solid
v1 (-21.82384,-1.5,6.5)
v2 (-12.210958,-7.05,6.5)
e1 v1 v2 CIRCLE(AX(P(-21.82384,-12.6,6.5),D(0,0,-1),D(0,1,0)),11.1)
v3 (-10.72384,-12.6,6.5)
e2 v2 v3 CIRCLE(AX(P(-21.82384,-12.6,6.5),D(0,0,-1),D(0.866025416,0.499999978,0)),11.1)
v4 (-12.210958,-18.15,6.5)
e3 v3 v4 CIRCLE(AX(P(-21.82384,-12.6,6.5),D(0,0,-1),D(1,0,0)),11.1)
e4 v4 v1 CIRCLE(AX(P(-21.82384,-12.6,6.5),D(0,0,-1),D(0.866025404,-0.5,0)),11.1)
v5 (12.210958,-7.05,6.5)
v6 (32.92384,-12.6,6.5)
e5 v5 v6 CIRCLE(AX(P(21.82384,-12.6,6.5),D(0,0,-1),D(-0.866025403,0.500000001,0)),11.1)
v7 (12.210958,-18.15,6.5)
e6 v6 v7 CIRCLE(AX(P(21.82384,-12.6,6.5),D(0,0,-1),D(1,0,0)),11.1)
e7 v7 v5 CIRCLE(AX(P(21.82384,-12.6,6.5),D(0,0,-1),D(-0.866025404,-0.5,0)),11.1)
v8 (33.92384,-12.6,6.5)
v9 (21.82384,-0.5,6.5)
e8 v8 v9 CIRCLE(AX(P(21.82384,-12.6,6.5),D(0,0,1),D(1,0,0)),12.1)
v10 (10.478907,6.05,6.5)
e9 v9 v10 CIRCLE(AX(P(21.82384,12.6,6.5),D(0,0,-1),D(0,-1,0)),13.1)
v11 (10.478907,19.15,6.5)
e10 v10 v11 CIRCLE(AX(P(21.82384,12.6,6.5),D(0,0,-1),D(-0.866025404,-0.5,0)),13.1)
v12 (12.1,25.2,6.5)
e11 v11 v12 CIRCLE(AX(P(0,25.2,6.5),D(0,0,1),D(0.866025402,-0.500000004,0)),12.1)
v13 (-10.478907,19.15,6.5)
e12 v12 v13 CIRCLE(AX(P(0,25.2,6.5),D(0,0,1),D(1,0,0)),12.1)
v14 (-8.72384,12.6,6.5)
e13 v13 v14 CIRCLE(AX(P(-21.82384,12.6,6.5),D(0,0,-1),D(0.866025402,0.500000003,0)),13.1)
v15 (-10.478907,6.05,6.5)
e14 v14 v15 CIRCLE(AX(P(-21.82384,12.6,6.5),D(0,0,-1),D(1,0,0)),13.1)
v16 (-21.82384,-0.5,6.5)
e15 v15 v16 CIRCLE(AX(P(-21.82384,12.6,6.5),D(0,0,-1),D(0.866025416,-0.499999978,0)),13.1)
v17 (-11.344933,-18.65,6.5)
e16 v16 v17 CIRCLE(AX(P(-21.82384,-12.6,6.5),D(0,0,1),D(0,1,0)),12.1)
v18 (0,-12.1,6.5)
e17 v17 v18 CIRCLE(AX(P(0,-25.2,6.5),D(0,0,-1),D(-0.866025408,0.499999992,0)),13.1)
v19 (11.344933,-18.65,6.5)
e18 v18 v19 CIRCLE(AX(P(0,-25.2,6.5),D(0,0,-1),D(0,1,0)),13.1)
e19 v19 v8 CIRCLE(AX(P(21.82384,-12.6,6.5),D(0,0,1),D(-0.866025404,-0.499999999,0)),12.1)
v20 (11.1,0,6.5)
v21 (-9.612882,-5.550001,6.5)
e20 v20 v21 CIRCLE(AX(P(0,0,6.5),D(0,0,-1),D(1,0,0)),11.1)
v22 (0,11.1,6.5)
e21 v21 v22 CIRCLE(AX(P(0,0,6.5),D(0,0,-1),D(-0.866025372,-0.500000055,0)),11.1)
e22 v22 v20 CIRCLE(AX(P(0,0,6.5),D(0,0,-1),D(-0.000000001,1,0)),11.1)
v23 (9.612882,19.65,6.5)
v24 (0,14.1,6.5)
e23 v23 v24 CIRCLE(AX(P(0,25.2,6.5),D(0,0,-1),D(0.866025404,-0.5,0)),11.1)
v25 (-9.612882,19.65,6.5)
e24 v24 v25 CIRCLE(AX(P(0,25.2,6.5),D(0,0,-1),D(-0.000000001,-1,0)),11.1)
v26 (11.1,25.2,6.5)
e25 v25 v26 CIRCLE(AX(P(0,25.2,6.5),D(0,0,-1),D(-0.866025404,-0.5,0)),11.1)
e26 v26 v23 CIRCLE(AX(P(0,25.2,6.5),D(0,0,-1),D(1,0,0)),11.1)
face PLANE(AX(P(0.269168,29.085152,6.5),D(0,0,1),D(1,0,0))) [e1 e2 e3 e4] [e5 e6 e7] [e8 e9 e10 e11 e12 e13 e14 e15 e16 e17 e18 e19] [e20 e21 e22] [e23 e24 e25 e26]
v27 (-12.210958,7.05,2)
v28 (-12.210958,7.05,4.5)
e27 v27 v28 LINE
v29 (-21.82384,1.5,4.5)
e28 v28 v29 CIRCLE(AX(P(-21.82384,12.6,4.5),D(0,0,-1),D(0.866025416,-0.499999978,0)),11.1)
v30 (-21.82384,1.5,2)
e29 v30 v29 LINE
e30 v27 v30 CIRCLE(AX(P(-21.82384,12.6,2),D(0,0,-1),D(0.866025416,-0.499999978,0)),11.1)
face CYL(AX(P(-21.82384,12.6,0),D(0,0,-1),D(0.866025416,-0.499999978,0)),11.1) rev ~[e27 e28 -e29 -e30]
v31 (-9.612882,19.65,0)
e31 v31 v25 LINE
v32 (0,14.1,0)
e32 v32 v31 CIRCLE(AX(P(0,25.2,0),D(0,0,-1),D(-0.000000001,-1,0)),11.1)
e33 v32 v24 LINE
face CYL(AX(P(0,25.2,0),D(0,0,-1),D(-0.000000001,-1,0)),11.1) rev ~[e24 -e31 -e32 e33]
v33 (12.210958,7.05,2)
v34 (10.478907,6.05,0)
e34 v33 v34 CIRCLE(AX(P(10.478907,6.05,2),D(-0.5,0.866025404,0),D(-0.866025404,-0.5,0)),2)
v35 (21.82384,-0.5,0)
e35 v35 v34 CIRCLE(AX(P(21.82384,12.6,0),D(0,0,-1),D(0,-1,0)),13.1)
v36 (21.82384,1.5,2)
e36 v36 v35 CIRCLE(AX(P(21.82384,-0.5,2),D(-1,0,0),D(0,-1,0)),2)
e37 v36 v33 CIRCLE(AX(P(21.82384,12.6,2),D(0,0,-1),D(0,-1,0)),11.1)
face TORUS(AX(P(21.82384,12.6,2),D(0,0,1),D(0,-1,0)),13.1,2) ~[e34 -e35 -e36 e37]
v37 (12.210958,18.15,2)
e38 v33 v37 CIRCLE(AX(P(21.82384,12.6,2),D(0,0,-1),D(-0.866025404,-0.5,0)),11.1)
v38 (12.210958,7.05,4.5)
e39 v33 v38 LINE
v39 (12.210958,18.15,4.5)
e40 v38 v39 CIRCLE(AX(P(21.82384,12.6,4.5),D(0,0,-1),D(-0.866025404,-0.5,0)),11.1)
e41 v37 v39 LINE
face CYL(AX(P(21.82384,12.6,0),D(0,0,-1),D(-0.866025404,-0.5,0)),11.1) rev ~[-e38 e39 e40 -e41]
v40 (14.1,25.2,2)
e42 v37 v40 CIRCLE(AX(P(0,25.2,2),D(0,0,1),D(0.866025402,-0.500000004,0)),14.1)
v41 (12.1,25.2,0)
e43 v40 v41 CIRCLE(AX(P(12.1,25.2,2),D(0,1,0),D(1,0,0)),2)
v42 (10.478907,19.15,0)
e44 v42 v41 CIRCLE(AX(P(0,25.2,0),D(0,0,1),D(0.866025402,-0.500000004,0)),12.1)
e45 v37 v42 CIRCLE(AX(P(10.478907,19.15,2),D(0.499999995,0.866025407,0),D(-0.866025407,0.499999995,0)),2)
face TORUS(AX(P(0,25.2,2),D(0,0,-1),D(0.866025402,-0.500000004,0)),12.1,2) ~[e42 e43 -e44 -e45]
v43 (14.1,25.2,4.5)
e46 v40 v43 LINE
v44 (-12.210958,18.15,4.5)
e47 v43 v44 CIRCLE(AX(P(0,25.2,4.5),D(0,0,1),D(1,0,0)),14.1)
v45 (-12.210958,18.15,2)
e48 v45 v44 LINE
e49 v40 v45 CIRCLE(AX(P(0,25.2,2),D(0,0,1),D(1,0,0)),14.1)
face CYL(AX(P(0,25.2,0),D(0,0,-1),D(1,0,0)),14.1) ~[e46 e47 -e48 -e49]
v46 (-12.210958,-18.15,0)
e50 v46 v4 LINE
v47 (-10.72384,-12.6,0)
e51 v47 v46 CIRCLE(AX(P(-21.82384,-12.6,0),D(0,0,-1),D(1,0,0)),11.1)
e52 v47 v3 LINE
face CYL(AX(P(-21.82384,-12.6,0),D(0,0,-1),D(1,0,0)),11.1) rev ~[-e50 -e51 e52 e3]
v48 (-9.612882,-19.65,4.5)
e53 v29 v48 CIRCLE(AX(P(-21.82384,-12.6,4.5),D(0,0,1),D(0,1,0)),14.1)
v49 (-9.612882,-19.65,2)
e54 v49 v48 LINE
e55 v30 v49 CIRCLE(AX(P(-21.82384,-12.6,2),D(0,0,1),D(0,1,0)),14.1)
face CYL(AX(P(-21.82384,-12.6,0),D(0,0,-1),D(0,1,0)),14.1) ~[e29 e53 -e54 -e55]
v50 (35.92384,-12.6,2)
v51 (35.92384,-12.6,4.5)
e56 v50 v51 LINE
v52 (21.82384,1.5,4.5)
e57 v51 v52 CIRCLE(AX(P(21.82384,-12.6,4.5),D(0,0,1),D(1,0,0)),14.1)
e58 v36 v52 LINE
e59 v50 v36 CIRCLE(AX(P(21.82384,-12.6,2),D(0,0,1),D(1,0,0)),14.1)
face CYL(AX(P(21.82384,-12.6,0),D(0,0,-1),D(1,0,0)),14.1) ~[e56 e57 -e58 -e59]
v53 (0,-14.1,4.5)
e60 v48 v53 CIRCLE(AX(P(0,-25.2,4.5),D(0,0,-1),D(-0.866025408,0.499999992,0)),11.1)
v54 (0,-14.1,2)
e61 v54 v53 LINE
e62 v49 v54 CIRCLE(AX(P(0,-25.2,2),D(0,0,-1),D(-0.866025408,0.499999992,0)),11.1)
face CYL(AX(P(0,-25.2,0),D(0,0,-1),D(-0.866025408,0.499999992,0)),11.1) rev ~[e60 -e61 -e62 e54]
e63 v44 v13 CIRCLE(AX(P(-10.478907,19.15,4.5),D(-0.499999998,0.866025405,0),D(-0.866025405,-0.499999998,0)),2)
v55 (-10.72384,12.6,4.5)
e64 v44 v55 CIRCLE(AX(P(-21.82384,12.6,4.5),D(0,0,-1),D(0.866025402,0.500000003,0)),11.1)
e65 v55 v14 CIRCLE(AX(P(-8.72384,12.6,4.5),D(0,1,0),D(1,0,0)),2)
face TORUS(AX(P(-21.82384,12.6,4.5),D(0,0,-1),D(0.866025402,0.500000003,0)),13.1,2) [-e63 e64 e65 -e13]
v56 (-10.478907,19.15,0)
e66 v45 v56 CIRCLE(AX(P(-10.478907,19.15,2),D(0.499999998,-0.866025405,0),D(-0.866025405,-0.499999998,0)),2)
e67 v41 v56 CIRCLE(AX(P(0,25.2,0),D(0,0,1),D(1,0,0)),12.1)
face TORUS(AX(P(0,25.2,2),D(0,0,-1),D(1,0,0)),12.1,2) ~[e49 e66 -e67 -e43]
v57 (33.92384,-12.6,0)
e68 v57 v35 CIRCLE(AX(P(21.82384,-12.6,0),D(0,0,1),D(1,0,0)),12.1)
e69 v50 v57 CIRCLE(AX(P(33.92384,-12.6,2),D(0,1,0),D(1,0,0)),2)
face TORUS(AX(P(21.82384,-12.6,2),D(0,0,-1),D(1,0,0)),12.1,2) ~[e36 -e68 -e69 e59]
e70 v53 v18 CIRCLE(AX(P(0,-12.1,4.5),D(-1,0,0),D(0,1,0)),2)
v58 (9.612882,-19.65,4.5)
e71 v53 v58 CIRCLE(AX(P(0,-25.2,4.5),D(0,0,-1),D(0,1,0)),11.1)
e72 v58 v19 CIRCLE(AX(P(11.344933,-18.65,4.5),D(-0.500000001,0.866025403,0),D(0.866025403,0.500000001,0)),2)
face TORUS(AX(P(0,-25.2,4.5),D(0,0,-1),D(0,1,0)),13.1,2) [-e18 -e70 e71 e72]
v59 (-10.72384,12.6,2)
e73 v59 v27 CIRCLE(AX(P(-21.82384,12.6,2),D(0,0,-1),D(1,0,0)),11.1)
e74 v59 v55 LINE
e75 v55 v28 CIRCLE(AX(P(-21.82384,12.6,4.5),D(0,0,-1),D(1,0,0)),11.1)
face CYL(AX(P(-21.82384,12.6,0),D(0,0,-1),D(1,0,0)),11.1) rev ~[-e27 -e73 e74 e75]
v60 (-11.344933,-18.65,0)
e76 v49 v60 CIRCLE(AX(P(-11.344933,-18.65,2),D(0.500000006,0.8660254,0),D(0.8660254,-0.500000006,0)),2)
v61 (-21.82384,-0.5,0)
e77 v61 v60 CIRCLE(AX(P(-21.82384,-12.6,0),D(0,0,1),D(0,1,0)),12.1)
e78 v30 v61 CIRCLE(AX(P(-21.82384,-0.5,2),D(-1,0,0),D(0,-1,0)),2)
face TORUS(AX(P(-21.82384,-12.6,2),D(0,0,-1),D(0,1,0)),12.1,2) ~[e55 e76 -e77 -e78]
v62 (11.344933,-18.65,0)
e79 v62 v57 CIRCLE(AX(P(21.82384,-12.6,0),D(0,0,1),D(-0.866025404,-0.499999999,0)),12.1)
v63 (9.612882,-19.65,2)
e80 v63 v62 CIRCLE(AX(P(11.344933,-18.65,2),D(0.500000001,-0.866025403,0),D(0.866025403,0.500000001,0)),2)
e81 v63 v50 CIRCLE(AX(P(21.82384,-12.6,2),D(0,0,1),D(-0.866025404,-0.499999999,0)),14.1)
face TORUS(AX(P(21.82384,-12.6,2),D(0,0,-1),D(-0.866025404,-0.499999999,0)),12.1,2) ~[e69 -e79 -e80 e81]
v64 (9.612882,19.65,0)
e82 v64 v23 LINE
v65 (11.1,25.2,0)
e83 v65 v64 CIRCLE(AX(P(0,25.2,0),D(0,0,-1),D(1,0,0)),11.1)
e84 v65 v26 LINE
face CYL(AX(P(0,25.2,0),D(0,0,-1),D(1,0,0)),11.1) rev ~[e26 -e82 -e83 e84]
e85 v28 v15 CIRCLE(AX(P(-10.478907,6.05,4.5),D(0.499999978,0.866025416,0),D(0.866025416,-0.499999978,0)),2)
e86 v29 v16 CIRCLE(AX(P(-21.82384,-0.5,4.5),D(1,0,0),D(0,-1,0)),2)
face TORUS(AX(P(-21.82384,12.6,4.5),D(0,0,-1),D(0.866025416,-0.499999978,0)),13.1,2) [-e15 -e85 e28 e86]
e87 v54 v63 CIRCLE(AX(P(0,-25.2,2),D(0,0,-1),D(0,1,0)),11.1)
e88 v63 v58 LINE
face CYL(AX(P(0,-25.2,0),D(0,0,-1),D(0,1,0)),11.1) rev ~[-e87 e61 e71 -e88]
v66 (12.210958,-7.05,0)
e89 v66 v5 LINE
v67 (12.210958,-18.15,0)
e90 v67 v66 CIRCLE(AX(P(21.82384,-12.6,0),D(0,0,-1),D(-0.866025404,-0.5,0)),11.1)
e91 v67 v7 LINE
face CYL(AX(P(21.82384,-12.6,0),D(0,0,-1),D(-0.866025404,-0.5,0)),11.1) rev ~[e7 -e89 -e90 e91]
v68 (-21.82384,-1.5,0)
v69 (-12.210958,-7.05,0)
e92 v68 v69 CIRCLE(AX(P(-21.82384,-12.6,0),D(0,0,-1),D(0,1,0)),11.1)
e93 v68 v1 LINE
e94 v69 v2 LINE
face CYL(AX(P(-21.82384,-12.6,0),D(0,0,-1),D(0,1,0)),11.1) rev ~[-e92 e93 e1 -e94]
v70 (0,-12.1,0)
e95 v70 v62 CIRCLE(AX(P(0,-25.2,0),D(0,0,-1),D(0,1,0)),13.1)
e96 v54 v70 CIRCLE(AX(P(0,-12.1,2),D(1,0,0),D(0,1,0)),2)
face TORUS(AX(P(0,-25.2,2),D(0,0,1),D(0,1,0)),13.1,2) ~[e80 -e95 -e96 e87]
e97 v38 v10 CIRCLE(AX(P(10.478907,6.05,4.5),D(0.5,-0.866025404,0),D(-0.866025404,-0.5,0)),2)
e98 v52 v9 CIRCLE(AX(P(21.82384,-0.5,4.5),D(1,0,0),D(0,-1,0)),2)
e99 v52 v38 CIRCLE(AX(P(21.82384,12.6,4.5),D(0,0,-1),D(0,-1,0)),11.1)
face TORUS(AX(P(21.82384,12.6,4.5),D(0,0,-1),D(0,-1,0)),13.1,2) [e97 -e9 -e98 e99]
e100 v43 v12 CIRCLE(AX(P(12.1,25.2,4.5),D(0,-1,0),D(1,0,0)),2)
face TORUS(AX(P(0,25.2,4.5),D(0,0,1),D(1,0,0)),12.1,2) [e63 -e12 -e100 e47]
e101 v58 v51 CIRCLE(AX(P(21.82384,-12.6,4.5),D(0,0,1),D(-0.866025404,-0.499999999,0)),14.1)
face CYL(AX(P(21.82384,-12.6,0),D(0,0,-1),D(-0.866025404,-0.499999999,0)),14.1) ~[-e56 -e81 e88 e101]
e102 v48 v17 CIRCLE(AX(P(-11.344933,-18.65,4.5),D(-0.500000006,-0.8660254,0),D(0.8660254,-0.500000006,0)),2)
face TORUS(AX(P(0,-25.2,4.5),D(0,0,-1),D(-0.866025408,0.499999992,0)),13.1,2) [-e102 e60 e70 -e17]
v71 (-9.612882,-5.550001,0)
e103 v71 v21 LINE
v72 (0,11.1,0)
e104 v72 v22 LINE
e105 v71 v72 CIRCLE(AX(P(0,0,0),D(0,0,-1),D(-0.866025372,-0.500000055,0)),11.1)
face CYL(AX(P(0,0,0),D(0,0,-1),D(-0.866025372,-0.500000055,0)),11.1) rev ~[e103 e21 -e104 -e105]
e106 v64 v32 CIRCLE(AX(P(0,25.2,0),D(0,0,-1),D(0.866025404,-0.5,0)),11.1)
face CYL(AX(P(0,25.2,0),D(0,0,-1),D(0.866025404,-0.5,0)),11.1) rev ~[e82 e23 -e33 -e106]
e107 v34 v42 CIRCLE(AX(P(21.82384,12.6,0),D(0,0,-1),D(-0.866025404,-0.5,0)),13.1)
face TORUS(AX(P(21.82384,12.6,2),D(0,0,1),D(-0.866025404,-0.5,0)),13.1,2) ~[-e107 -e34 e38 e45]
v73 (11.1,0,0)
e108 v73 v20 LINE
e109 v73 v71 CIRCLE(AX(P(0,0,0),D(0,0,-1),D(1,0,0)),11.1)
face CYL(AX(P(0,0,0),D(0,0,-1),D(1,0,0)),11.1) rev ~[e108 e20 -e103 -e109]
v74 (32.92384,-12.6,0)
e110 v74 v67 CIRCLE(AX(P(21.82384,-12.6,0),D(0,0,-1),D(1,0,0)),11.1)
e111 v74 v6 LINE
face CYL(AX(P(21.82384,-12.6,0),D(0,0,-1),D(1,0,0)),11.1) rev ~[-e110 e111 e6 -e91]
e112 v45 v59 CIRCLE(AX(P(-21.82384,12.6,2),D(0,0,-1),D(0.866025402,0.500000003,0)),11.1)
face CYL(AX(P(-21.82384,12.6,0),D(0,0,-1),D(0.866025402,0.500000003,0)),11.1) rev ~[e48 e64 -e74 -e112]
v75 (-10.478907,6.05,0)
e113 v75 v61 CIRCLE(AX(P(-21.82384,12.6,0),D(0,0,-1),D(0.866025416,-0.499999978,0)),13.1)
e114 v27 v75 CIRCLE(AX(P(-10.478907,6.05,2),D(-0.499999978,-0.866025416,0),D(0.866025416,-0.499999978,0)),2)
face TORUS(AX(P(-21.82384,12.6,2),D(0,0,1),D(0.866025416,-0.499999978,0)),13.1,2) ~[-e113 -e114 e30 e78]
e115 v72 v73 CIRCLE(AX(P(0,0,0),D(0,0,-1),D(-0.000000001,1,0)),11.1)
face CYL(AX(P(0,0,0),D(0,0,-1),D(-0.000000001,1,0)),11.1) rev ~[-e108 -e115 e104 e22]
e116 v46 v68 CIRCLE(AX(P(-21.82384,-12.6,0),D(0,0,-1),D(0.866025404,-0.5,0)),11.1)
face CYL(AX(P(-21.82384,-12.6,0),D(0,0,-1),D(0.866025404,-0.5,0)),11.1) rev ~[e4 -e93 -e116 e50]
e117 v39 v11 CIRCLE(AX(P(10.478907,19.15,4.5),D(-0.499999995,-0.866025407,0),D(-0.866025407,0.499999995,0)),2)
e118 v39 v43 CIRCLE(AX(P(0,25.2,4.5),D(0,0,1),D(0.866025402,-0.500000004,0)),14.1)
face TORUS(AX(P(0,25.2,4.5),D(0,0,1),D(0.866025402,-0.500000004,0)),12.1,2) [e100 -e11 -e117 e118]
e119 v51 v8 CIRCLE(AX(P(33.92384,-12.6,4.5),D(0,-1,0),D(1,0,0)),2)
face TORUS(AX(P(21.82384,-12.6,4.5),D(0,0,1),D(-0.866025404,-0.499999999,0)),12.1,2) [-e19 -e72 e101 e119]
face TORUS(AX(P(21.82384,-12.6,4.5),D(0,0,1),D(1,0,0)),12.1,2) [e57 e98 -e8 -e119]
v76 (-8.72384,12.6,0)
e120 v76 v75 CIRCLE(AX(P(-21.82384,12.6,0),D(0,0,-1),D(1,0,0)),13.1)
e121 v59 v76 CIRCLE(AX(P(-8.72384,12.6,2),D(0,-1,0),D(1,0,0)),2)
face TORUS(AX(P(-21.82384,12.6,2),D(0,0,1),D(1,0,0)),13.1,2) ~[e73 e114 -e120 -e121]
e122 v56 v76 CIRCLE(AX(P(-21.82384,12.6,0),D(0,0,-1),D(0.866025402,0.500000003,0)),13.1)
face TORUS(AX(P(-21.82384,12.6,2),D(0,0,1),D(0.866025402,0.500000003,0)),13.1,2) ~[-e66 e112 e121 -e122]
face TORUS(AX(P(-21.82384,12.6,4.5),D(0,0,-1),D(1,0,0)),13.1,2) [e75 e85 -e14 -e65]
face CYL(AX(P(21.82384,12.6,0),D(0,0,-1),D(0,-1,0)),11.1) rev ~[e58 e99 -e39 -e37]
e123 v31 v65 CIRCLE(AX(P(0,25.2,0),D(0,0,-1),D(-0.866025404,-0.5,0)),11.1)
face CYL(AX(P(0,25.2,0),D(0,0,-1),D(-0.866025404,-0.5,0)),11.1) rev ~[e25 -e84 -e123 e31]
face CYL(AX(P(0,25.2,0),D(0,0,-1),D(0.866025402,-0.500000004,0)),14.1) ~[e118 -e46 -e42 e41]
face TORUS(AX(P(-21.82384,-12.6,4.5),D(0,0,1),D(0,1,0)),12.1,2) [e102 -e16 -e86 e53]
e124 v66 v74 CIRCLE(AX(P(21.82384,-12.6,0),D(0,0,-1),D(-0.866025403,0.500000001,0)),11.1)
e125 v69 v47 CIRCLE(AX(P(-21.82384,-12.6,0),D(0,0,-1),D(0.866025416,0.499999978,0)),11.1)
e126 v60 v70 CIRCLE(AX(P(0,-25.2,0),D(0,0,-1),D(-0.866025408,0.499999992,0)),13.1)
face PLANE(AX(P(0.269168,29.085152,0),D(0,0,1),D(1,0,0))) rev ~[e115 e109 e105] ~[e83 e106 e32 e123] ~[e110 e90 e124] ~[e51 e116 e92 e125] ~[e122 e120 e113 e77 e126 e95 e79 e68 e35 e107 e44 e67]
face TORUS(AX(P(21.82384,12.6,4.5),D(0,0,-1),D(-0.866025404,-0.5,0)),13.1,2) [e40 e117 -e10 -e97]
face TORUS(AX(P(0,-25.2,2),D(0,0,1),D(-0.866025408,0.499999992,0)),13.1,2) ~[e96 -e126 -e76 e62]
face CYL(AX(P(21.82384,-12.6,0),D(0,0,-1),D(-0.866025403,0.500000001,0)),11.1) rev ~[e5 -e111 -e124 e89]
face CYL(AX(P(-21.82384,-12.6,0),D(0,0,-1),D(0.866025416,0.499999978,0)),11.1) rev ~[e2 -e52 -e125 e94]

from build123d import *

# Parameters (mm, degrees)
F1_DEPTH = 6.5
F2_R     = 2


# Not quite as in the source:
# - ends of sketch curves that miss each other by under 0.0002 mm in the source are joined


with BuildPart() as f1:
    # F0 (on Top) → F1 (new body)
    with BuildSketch(Plane.XY):
        with BuildLine():
            Line((-12.2109581934, 18.15), (-9.612881982, 19.65))
            ThreePointArc((-9.612881982, 19.65), (-2.8728914006, 35.9217766718), (11.1, 25.2))
            ThreePointArc((11.1, 25.2), (10.7217766718, 22.3271085994), (9.612881982, 19.65))
            Line((9.612881982, 19.65), (12.2109581934, 18.15))
            ThreePointArc((12.2109581619, 18.1499999455), (13.6195541425, 21.5506514337), (14.1, 25.2))
            ThreePointArc((14.1, 25.2), (-3.649348519, 38.8195541552), (-12.2109582109, 18.1500000304))
        make_face()
        with BuildLine():
            ThreePointArc((-6.3285069329, 12.6), (-3.2519225117, 13.7198760919), (-7e-09, 14.1))
            ThreePointArc((-7e-09, 14.1), (-5.550000003, 15.5871180197), (-9.612881982, 19.65))
            Line((-9.612881982, 19.65), (-12.2109581934, 18.15))
            ThreePointArc((-12.2109582109, 18.1500000304), (-9.6761855625, 14.9442000331), (-6.3285069329, 12.6))
        make_face()
        with BuildLine():
            ThreePointArc((-12.2109580547, 7.0500002402), (-9.6761854488, 10.2558000741), (-6.3285069329, 12.6))
            ThreePointArc((-6.3285069329, 12.6), (-9.6761855625, 14.9442000331), (-12.2109582109, 18.1500000304))
            ThreePointArc((-12.2109582109, 18.1500000304), (-11.1020635081, 15.4728914176), (-10.7238401754, 12.6))
            ThreePointArc((-10.7238401754, 12.6), (-11.1020634677, 9.7271087333), (-12.2109580547, 7.0500002402))
        make_face()
        with BuildLine():
            ThreePointArc((-9.6128816287, -5.5500006119), (-9.6128821611, 5.5499996898), (-9.7e-09, 11.1))
            ThreePointArc((-9.7e-09, 11.1), (-3.251922513, 11.4801239084), (-6.3285069329, 12.6))
            ThreePointArc((-6.3285069329, 12.6), (-9.6761854488, 10.2558000741), (-12.2109580547, 7.0500002402))
            ThreePointArc((-12.2109580547, 7.0500002402), (-13.7198760608, 3.2519226432), (-14.0761735541, -0.8193522281))
            ThreePointArc((-14.0761735541, -0.8193522281), (-11.568039954, -2.9238147073), (-9.6128816287, -5.5500006119))
        make_face()
        with BuildLine():
            ThreePointArc((-21.8238401754, 1.5), (-17.7801496323, 0.9077224872), (-14.0761735541, -0.8193522281))
            ThreePointArc((-14.0761735541, -0.8193522281), (-13.7198760608, 3.2519226432), (-12.2109580547, 7.0500002402))
            ThreePointArc((-12.2109580547, 7.0500002402), (-16.2738400553, 2.9871180873), (-21.8238401754, 1.5))
        make_face()
        with BuildLine():
            ThreePointArc((-12.2109580547, -7.0500002402), (-13.5077224475, -4.0436906759), (-14.0761735541, -0.8193522281))
            ThreePointArc((-14.0761735541, -0.8193522281), (-17.7801496323, 0.9077224872), (-21.8238401754, 1.5))
            Line((-21.8238401754, 1.5), (-21.8238401754, -1.5))
            ThreePointArc((-21.8238401754, -1.5), (-16.2738400553, -2.9871180873), (-12.2109580547, -7.0500002402))
        make_face()
        with BuildLine():
            Line((-21.8238401754, -1.5), (-21.8238401754, 1.5))
            ThreePointArc((-21.8238401754, 1.5), (-34.0347983948, -19.6499999548), (-9.6128820342, -19.6500000904))
            Line((-9.6128820342, -19.6500000904), (-12.2109581934, -18.15))
            ThreePointArc((-12.2109581934, -18.15), (-31.4367221574, -18.15), (-21.8238401754, -1.5))
        make_face()
        with BuildLine():
            ThreePointArc((-7.7238401754, -12.6), (-7.7297980456, -12.1901507066), (-7.7476666212, -11.7806477719))
            ThreePointArc((-7.7476666212, -11.7806477719), (-10.2557998838, -9.6761856506), (-12.2109580547, -7.0500002402))
            ThreePointArc((-12.2109580547, -7.0500002402), (-11.1020634677, -9.7271087333), (-10.7238401754, -12.6))
            ThreePointArc((-10.7238401754, -12.6), (-11.1020635036, -15.4728914006), (-12.2109581934, -18.15))
            Line((-12.2109581934, -18.15), (-9.612881982, -19.65))
            ThreePointArc((-9.612881982, -19.65), (-8.2042860382, -16.2493485864), (-7.7238401754, -12.6))
        make_face()
        with BuildLine():
            ThreePointArc((-7.7476666212, -11.7806477719), (-8.3161175868, -8.5563097954), (-9.6128816287, -5.5500006119))
            ThreePointArc((-9.6128816287, -5.5500006119), (-11.568039954, -2.9238147073), (-14.0761735541, -0.8193522281))
            ThreePointArc((-14.0761735541, -0.8193522281), (-13.5077224475, -4.0436906759), (-12.2109580547, -7.0500002402))
            ThreePointArc((-12.2109580547, -7.0500002402), (-10.2557998838, -9.6761856506), (-7.7476666212, -11.7806477719))
        make_face()
        with BuildLine():
            ThreePointArc((0, -14.1), (-4.043690543, -13.5077224872), (-7.7476666212, -11.7806477719))
            ThreePointArc((-7.7476666212, -11.7806477719), (-7.7297980456, -12.1901507066), (-7.7238401754, -12.6))
            ThreePointArc((-7.7238401754, -12.6), (-8.2042860382, -16.2493485864), (-9.6128820342, -19.6500000904))
            ThreePointArc((-9.6128820342, -19.6500000904), (-5.5500000452, -15.5871180441), (0, -14.1))
        make_face()
        with BuildLine():
            ThreePointArc((7.7476666212, -11.7806477719), (8.3161176063, -8.5563097302), (9.6128816968, -5.550000494))
            ThreePointArc((9.6128816968, -5.550000494), (6.81e-08, -11.1), (-9.6128816287, -5.5500006119))
            ThreePointArc((-9.6128816287, -5.5500006119), (-8.3161175868, -8.5563097954), (-7.7476666212, -11.7806477719))
            ThreePointArc((-7.7476666212, -11.7806477719), (-4.043690543, -13.5077224872), (0, -14.1))
            ThreePointArc((0, -14.1), (4.043690543, -13.5077224872), (7.7476666212, -11.7806477719))
        make_face()
        with BuildLine():
            ThreePointArc((9.6128819758, -19.6499999892), (8.1039640812, -15.8519225022), (7.7476666212, -11.7806477719))
            ThreePointArc((7.7476666212, -11.7806477719), (4.043690543, -13.5077224872), (0, -14.1))
            ThreePointArc((0, -14.1), (5.5499999946, -15.5871180149), (9.6128819758, -19.6499999892))
        make_face()
        with BuildLine():
            ThreePointArc((12.2109582009, -7.0499999869), (10.2557999841, -9.6761855442), (7.7476666212, -11.7806477719))
            ThreePointArc((7.7476666212, -11.7806477719), (8.1039640812, -15.8519225022), (9.6128819758, -19.6499999892))
            Line((9.612881982, -19.65), (12.2109581934, -18.15))
            ThreePointArc((12.2109581934, -18.15), (10.7238401754, -12.5999999925), (12.2109582009, -7.0499999869))
        make_face()
        with BuildLine():
            ThreePointArc((14.0761735541, -0.8193522281), (11.5680400007, -2.9238146578), (9.6128816968, -5.550000494))
            ThreePointArc((9.6128816968, -5.550000494), (8.3161176063, -8.5563097302), (7.7476666212, -11.7806477719))
            ThreePointArc((7.7476666212, -11.7806477719), (10.2557999841, -9.6761855442), (12.2109582009, -7.0499999869))
            ThreePointArc((12.2109582009, -7.0499999869), (13.5077224894, -4.0436905358), (14.0761735541, -0.8193522281))
        make_face()
        with BuildLine():
            ThreePointArc((21.8238401754, 1.5), (17.7801496323, 0.9077224872), (14.0761735541, -0.8193522281))
            ThreePointArc((14.0761735541, -0.8193522281), (13.5077224894, -4.0436905358), (12.2109582009, -7.0499999869))
            ThreePointArc((12.2109582009, -7.0499999869), (16.2738401819, -2.9871180142), (21.8238401754, -1.5))
            Line((21.8238401754, -1.5), (21.8238401754, 1.5))
        make_face()
        with BuildLine():
            ThreePointArc((35.9238401754, -12.6), (31.7940457901, -2.6297943853), (21.8238401754, 1.5))
            Line((21.8238401754, 1.5), (21.8238401754, -1.5))
            ThreePointArc((21.8238401754, -1.5), (29.6727254465, -4.7511147288), (32.9238401754, -12.6))
            ThreePointArc((32.9238401754, -12.6), (24.696731576, -23.3217766718), (12.2109581934, -18.15))
            Line((12.2109581934, -18.15), (9.612881982, -19.65))
            ThreePointArc((9.6128819758, -19.6499999892), (25.4731887053, -26.2195541523), (35.9238401754, -12.6))
        make_face()
        with BuildLine():
            ThreePointArc((14.1, 0), (14.0940421298, -0.4098492934), (14.0761735541, -0.8193522281))
            ThreePointArc((14.0761735541, -0.8193522281), (17.7801496323, 0.9077224872), (21.8238401754, 1.5))
            ThreePointArc((21.8238401754, 1.5), (16.2738401733, 2.9871180192), (12.210958191, 7.0500000041))
            ThreePointArc((12.210958191, 7.0500000041), (13.6195541501, 3.6493485383), (14.1, 0))
        make_face()
        with BuildLine():
            ThreePointArc((-9.7e-09, 11.1), (7.8488852677, 7.8488852746), (11.1, 0))
            ThreePointArc((11.1, 0), (10.721776598, -2.8728916761), (9.6128816968, -5.550000494))
            ThreePointArc((9.6128816968, -5.550000494), (11.5680400007, -2.9238146578), (14.0761735541, -0.8193522281))
            ThreePointArc((14.0761735541, -0.8193522281), (14.0940421298, -0.4098492934), (14.1, 0))
            ThreePointArc((14.1, 0), (13.6195541501, 3.6493485383), (12.210958191, 7.0500000041))
            ThreePointArc((12.210958191, 7.0500000041), (9.676185548, 10.2557999806), (6.3285069329, 12.6))
            ThreePointArc((6.3285069329, 12.6), (3.2519225036, 11.4801239061), (-9.7e-09, 11.1))
        make_face()
        with BuildLine():
            ThreePointArc((12.2109581619, 18.1499999455), (9.6761855268, 14.9441999995), (6.3285069329, 12.6))
            ThreePointArc((6.3285069329, 12.6), (9.676185548, 10.2557999806), (12.210958191, 7.0500000041))
            ThreePointArc((12.210958191, 7.0500000041), (10.7238401754, 12.5999999709), (12.2109581619, 18.1499999455))
        make_face()
        with BuildLine():
            ThreePointArc((9.612881982, 19.65), (5.549999997, 15.5871180162), (-7e-09, 14.1))
            ThreePointArc((-7e-09, 14.1), (3.2519225049, 13.7198760935), (6.3285069329, 12.6))
            ThreePointArc((6.3285069329, 12.6), (9.6761855268, 14.9441999995), (12.2109581619, 18.1499999455))
            Line((12.2109581934, 18.15), (9.612881982, 19.65))
        make_face()
        with BuildLine():
            Line((0, 14.1), (0, 11.1))
            ThreePointArc((-9.7e-09, 11.1), (3.2519225036, 11.4801239061), (6.3285069329, 12.6))
            ThreePointArc((6.3285069329, 12.6), (3.2519225049, 13.7198760935), (-7e-09, 14.1))
        make_face()
        with BuildLine():
            ThreePointArc((-6.3285069329, 12.6), (-3.251922513, 11.4801239084), (-9.7e-09, 11.1))
            Line((0, 11.1), (0, 14.1))
            ThreePointArc((-7e-09, 14.1), (-3.2519225117, 13.7198760919), (-6.3285069329, 12.6))
        make_face()
    extrude(amount=F1_DEPTH)

    # F2
    f2_edges = [f1.edges().sort_by_distance(p)[0] for p in [
        (0, -14.1, 6.5),
        (0, -14.1, 0),
        (12.210958, 7.05, 0),
        (12.210958, 7.05, 6.5),
        (0, 39.3, 0),
        (0, 39.3, 6.5),
        (-12.210958, 7.05, 0),
        (-12.210958, 7.05, 6.5),
        (-34.034798, -19.65, 0),
        (-34.034798, -19.65, 6.5),
        (34.034798, -19.65, 0),
        (34.034798, -19.65, 6.5),
    ]]
    fillet(f2_edges, radius=F2_R)


solid = f1.part
